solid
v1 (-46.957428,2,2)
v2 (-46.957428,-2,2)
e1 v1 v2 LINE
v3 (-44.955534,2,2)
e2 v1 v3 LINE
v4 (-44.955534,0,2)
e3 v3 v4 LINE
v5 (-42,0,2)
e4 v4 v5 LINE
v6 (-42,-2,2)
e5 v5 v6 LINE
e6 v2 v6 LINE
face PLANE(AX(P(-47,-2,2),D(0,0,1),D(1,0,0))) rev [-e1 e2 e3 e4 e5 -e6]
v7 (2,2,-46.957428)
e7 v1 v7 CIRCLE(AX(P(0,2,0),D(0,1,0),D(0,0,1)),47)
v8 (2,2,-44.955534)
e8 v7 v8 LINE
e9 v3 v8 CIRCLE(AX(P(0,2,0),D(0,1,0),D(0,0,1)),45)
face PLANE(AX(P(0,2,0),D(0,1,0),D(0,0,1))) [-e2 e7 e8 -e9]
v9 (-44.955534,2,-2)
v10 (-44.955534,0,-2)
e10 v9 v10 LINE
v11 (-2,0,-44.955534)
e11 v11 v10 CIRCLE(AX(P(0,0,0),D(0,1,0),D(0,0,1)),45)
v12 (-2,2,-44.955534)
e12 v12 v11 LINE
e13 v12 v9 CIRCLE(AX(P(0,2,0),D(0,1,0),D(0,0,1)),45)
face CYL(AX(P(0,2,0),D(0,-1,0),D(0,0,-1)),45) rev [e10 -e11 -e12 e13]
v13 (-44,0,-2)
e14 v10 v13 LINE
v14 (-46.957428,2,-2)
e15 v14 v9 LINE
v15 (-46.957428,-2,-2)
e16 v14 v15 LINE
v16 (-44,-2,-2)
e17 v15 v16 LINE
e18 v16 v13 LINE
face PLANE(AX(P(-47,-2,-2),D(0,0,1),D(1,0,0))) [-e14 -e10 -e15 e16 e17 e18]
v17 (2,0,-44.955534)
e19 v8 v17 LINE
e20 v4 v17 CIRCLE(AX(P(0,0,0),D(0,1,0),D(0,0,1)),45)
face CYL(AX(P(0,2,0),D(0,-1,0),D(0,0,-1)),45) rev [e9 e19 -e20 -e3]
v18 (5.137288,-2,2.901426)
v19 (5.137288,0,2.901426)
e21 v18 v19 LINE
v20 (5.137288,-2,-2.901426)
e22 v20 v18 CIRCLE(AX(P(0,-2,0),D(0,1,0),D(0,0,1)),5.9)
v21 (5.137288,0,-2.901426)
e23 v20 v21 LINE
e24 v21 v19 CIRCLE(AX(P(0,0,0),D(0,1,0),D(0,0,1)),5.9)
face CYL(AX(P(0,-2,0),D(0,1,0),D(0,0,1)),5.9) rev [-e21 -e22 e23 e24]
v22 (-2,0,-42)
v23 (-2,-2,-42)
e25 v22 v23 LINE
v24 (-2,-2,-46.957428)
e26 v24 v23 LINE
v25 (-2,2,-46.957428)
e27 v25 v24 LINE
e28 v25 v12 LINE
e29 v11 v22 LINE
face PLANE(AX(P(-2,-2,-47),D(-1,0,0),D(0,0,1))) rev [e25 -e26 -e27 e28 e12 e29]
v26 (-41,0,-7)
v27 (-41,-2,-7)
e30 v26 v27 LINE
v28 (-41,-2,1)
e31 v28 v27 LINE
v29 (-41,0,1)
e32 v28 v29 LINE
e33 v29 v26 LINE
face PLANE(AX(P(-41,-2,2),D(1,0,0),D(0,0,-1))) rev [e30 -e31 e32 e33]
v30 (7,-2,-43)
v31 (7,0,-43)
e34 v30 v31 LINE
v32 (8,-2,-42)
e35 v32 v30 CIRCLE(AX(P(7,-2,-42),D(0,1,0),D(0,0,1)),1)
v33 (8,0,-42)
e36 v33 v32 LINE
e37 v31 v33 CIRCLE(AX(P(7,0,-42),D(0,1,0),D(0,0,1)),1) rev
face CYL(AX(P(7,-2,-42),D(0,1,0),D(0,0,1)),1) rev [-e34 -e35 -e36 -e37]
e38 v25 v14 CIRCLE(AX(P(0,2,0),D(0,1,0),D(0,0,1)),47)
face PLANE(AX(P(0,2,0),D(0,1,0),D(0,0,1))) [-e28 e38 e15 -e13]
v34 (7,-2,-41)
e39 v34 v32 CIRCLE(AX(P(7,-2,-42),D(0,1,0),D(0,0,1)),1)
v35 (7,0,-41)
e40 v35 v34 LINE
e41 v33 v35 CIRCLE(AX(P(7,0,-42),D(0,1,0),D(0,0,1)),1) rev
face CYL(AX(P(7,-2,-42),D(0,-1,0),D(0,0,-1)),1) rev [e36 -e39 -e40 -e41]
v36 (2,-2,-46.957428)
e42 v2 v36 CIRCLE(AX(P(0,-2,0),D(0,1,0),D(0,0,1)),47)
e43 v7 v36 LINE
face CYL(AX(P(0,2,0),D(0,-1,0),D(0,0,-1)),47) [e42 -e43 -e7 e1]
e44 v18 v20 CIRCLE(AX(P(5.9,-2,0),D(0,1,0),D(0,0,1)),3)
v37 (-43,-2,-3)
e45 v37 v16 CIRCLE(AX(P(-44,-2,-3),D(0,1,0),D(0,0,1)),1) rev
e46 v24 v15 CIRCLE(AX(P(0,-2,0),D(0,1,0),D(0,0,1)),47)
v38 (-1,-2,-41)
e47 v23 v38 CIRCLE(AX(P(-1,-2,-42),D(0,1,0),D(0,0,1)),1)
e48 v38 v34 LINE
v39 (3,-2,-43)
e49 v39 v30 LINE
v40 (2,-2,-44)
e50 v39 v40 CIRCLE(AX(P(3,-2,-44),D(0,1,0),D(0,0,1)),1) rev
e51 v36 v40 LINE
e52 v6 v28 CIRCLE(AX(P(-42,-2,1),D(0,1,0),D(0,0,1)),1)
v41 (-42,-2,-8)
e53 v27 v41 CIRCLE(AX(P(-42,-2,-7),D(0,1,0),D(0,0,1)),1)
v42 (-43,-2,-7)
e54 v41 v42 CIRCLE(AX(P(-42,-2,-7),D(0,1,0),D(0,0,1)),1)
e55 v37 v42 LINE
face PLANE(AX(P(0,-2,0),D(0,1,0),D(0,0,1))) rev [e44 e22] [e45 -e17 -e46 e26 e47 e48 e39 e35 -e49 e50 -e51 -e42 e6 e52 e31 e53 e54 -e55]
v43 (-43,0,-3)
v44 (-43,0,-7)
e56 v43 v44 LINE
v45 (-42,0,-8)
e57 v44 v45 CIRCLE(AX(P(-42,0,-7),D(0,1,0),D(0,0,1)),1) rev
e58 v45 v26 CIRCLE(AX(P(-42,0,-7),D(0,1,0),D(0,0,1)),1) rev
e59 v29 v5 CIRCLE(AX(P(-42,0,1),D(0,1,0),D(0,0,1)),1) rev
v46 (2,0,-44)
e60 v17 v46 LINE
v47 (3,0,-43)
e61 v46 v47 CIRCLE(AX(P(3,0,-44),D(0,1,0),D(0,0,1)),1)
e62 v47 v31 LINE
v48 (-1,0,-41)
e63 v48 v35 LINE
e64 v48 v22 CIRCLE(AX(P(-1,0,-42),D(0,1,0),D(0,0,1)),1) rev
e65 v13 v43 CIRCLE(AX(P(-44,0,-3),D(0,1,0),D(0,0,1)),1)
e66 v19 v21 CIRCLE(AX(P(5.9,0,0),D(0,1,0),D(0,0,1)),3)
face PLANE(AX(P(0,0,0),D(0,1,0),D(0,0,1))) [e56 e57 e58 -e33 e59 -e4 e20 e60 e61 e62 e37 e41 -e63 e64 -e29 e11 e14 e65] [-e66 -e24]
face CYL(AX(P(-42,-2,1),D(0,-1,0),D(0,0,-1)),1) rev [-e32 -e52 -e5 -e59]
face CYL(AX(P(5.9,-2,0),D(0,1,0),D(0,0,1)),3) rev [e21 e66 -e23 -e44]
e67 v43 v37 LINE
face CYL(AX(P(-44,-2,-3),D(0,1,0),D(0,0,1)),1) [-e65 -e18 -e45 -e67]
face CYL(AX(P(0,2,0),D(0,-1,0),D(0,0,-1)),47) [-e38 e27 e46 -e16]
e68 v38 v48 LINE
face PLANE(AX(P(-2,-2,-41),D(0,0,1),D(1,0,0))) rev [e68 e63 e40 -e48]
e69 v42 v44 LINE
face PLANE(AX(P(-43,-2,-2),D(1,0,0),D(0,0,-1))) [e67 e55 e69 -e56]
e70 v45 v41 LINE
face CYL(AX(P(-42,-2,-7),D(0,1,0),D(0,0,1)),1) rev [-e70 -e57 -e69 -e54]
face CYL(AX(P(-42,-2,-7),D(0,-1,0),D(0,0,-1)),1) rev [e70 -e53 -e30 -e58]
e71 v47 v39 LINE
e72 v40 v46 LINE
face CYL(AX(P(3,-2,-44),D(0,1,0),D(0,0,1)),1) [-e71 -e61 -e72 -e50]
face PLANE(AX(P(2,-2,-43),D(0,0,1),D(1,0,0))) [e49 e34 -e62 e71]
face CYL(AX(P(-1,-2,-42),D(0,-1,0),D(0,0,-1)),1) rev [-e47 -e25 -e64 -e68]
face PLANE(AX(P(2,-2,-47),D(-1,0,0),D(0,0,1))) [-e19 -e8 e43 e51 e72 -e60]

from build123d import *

# Parameters (mm, degrees)
SKETCH1_R                     = 45
OUTER_DISK_DEPTH              = 2
ENCLOSEMENT_T                 = 2
HOOK_RELEASE_DEPTH            = 67.498120274
CIRPATTERN1_COUNT             = 2
CIRPATTERN1_ANGLE             = 90
SERVO_MOTOR_CUTOUT_DEPTH      = 67.498120274
SERVO_MOTOR_CUTOUT_DEPTH_BACK = 67.498120274
SKETCH3_R                     = 3
SKETCH3_R_2                   = 5.9
FILLET1_R                     = 1


with BuildPart() as part:
    # Sketch1 → Outer DIsk (new body)
    with BuildSketch(Plane(origin=(0, 0, 0), x_dir=(1, 0, 0), z_dir=(0, 1, 0))):
        with Locations(Location((0, 0, 0), (0, 0, 270))):
            Circle(SKETCH1_R)
    extrude(amount=OUTER_DISK_DEPTH)

    # Enclosement
    enclosement_openings = [part.faces().sort_by_distance(p)[0] for p in [
        (0, 2, 0),
    ]]
    offset(amount=ENCLOSEMENT_T, openings=enclosement_openings, kind=Kind.INTERSECTION)

    # Sketch2 → Hook Release (cut, symmetric)
    with BuildSketch(Plane(origin=(0, 0, 0), x_dir=(1, 0, 0), z_dir=(0, 1, 0))):
        Polygon((-2, 47), (-2, 41), (8, 41), (8, 43), (2, 43), (2, 47), align=None)
    hook_release = extrude(amount=HOOK_RELEASE_DEPTH, both=True, mode=Mode.SUBTRACT)

    # CirPattern1: Hook Release ×2 about axis
    cirpattern1_axis = Axis((0, 0, 0), (0, 1, 0))
    for i in range(1, CIRPATTERN1_COUNT):
        add(hook_release.rotate(cirpattern1_axis, i * CIRPATTERN1_ANGLE / (CIRPATTERN1_COUNT - 1)), mode=Mode.SUBTRACT)

    # Sketch3 → Servo Motor Cutout (cut, two sides: drawn at the far end of the back side and taken through both)
    with BuildSketch(Plane(origin=(0, 0, 0), x_dir=(1, 0, 0), z_dir=(0, 1, 0)).offset(-SERVO_MOTOR_CUTOUT_DEPTH_BACK)):
        with Locations((5.9, 0)):
            Circle(SKETCH3_R)
        Circle(SKETCH3_R_2)
    extrude(amount=SERVO_MOTOR_CUTOUT_DEPTH + SERVO_MOTOR_CUTOUT_DEPTH_BACK, mode=Mode.SUBTRACT)

    # Fillet1
    fillet1_edges = [part.edges().sort_by_distance(p)[0] for p in [
        (-41, -1, 2),
        (-41, -1, -8),
        (-43, -1, -8),
        (-43, -1, -2),
        (8, -1, -41),
        (-2, -1, -41),
        (8, -1, -43),
        (2, -1, -43),
    ]]
    fillet(fillet1_edges, radius=FILLET1_R - 0.0001)  # a hair under: the kernel refuses the full size


solid = part.part
